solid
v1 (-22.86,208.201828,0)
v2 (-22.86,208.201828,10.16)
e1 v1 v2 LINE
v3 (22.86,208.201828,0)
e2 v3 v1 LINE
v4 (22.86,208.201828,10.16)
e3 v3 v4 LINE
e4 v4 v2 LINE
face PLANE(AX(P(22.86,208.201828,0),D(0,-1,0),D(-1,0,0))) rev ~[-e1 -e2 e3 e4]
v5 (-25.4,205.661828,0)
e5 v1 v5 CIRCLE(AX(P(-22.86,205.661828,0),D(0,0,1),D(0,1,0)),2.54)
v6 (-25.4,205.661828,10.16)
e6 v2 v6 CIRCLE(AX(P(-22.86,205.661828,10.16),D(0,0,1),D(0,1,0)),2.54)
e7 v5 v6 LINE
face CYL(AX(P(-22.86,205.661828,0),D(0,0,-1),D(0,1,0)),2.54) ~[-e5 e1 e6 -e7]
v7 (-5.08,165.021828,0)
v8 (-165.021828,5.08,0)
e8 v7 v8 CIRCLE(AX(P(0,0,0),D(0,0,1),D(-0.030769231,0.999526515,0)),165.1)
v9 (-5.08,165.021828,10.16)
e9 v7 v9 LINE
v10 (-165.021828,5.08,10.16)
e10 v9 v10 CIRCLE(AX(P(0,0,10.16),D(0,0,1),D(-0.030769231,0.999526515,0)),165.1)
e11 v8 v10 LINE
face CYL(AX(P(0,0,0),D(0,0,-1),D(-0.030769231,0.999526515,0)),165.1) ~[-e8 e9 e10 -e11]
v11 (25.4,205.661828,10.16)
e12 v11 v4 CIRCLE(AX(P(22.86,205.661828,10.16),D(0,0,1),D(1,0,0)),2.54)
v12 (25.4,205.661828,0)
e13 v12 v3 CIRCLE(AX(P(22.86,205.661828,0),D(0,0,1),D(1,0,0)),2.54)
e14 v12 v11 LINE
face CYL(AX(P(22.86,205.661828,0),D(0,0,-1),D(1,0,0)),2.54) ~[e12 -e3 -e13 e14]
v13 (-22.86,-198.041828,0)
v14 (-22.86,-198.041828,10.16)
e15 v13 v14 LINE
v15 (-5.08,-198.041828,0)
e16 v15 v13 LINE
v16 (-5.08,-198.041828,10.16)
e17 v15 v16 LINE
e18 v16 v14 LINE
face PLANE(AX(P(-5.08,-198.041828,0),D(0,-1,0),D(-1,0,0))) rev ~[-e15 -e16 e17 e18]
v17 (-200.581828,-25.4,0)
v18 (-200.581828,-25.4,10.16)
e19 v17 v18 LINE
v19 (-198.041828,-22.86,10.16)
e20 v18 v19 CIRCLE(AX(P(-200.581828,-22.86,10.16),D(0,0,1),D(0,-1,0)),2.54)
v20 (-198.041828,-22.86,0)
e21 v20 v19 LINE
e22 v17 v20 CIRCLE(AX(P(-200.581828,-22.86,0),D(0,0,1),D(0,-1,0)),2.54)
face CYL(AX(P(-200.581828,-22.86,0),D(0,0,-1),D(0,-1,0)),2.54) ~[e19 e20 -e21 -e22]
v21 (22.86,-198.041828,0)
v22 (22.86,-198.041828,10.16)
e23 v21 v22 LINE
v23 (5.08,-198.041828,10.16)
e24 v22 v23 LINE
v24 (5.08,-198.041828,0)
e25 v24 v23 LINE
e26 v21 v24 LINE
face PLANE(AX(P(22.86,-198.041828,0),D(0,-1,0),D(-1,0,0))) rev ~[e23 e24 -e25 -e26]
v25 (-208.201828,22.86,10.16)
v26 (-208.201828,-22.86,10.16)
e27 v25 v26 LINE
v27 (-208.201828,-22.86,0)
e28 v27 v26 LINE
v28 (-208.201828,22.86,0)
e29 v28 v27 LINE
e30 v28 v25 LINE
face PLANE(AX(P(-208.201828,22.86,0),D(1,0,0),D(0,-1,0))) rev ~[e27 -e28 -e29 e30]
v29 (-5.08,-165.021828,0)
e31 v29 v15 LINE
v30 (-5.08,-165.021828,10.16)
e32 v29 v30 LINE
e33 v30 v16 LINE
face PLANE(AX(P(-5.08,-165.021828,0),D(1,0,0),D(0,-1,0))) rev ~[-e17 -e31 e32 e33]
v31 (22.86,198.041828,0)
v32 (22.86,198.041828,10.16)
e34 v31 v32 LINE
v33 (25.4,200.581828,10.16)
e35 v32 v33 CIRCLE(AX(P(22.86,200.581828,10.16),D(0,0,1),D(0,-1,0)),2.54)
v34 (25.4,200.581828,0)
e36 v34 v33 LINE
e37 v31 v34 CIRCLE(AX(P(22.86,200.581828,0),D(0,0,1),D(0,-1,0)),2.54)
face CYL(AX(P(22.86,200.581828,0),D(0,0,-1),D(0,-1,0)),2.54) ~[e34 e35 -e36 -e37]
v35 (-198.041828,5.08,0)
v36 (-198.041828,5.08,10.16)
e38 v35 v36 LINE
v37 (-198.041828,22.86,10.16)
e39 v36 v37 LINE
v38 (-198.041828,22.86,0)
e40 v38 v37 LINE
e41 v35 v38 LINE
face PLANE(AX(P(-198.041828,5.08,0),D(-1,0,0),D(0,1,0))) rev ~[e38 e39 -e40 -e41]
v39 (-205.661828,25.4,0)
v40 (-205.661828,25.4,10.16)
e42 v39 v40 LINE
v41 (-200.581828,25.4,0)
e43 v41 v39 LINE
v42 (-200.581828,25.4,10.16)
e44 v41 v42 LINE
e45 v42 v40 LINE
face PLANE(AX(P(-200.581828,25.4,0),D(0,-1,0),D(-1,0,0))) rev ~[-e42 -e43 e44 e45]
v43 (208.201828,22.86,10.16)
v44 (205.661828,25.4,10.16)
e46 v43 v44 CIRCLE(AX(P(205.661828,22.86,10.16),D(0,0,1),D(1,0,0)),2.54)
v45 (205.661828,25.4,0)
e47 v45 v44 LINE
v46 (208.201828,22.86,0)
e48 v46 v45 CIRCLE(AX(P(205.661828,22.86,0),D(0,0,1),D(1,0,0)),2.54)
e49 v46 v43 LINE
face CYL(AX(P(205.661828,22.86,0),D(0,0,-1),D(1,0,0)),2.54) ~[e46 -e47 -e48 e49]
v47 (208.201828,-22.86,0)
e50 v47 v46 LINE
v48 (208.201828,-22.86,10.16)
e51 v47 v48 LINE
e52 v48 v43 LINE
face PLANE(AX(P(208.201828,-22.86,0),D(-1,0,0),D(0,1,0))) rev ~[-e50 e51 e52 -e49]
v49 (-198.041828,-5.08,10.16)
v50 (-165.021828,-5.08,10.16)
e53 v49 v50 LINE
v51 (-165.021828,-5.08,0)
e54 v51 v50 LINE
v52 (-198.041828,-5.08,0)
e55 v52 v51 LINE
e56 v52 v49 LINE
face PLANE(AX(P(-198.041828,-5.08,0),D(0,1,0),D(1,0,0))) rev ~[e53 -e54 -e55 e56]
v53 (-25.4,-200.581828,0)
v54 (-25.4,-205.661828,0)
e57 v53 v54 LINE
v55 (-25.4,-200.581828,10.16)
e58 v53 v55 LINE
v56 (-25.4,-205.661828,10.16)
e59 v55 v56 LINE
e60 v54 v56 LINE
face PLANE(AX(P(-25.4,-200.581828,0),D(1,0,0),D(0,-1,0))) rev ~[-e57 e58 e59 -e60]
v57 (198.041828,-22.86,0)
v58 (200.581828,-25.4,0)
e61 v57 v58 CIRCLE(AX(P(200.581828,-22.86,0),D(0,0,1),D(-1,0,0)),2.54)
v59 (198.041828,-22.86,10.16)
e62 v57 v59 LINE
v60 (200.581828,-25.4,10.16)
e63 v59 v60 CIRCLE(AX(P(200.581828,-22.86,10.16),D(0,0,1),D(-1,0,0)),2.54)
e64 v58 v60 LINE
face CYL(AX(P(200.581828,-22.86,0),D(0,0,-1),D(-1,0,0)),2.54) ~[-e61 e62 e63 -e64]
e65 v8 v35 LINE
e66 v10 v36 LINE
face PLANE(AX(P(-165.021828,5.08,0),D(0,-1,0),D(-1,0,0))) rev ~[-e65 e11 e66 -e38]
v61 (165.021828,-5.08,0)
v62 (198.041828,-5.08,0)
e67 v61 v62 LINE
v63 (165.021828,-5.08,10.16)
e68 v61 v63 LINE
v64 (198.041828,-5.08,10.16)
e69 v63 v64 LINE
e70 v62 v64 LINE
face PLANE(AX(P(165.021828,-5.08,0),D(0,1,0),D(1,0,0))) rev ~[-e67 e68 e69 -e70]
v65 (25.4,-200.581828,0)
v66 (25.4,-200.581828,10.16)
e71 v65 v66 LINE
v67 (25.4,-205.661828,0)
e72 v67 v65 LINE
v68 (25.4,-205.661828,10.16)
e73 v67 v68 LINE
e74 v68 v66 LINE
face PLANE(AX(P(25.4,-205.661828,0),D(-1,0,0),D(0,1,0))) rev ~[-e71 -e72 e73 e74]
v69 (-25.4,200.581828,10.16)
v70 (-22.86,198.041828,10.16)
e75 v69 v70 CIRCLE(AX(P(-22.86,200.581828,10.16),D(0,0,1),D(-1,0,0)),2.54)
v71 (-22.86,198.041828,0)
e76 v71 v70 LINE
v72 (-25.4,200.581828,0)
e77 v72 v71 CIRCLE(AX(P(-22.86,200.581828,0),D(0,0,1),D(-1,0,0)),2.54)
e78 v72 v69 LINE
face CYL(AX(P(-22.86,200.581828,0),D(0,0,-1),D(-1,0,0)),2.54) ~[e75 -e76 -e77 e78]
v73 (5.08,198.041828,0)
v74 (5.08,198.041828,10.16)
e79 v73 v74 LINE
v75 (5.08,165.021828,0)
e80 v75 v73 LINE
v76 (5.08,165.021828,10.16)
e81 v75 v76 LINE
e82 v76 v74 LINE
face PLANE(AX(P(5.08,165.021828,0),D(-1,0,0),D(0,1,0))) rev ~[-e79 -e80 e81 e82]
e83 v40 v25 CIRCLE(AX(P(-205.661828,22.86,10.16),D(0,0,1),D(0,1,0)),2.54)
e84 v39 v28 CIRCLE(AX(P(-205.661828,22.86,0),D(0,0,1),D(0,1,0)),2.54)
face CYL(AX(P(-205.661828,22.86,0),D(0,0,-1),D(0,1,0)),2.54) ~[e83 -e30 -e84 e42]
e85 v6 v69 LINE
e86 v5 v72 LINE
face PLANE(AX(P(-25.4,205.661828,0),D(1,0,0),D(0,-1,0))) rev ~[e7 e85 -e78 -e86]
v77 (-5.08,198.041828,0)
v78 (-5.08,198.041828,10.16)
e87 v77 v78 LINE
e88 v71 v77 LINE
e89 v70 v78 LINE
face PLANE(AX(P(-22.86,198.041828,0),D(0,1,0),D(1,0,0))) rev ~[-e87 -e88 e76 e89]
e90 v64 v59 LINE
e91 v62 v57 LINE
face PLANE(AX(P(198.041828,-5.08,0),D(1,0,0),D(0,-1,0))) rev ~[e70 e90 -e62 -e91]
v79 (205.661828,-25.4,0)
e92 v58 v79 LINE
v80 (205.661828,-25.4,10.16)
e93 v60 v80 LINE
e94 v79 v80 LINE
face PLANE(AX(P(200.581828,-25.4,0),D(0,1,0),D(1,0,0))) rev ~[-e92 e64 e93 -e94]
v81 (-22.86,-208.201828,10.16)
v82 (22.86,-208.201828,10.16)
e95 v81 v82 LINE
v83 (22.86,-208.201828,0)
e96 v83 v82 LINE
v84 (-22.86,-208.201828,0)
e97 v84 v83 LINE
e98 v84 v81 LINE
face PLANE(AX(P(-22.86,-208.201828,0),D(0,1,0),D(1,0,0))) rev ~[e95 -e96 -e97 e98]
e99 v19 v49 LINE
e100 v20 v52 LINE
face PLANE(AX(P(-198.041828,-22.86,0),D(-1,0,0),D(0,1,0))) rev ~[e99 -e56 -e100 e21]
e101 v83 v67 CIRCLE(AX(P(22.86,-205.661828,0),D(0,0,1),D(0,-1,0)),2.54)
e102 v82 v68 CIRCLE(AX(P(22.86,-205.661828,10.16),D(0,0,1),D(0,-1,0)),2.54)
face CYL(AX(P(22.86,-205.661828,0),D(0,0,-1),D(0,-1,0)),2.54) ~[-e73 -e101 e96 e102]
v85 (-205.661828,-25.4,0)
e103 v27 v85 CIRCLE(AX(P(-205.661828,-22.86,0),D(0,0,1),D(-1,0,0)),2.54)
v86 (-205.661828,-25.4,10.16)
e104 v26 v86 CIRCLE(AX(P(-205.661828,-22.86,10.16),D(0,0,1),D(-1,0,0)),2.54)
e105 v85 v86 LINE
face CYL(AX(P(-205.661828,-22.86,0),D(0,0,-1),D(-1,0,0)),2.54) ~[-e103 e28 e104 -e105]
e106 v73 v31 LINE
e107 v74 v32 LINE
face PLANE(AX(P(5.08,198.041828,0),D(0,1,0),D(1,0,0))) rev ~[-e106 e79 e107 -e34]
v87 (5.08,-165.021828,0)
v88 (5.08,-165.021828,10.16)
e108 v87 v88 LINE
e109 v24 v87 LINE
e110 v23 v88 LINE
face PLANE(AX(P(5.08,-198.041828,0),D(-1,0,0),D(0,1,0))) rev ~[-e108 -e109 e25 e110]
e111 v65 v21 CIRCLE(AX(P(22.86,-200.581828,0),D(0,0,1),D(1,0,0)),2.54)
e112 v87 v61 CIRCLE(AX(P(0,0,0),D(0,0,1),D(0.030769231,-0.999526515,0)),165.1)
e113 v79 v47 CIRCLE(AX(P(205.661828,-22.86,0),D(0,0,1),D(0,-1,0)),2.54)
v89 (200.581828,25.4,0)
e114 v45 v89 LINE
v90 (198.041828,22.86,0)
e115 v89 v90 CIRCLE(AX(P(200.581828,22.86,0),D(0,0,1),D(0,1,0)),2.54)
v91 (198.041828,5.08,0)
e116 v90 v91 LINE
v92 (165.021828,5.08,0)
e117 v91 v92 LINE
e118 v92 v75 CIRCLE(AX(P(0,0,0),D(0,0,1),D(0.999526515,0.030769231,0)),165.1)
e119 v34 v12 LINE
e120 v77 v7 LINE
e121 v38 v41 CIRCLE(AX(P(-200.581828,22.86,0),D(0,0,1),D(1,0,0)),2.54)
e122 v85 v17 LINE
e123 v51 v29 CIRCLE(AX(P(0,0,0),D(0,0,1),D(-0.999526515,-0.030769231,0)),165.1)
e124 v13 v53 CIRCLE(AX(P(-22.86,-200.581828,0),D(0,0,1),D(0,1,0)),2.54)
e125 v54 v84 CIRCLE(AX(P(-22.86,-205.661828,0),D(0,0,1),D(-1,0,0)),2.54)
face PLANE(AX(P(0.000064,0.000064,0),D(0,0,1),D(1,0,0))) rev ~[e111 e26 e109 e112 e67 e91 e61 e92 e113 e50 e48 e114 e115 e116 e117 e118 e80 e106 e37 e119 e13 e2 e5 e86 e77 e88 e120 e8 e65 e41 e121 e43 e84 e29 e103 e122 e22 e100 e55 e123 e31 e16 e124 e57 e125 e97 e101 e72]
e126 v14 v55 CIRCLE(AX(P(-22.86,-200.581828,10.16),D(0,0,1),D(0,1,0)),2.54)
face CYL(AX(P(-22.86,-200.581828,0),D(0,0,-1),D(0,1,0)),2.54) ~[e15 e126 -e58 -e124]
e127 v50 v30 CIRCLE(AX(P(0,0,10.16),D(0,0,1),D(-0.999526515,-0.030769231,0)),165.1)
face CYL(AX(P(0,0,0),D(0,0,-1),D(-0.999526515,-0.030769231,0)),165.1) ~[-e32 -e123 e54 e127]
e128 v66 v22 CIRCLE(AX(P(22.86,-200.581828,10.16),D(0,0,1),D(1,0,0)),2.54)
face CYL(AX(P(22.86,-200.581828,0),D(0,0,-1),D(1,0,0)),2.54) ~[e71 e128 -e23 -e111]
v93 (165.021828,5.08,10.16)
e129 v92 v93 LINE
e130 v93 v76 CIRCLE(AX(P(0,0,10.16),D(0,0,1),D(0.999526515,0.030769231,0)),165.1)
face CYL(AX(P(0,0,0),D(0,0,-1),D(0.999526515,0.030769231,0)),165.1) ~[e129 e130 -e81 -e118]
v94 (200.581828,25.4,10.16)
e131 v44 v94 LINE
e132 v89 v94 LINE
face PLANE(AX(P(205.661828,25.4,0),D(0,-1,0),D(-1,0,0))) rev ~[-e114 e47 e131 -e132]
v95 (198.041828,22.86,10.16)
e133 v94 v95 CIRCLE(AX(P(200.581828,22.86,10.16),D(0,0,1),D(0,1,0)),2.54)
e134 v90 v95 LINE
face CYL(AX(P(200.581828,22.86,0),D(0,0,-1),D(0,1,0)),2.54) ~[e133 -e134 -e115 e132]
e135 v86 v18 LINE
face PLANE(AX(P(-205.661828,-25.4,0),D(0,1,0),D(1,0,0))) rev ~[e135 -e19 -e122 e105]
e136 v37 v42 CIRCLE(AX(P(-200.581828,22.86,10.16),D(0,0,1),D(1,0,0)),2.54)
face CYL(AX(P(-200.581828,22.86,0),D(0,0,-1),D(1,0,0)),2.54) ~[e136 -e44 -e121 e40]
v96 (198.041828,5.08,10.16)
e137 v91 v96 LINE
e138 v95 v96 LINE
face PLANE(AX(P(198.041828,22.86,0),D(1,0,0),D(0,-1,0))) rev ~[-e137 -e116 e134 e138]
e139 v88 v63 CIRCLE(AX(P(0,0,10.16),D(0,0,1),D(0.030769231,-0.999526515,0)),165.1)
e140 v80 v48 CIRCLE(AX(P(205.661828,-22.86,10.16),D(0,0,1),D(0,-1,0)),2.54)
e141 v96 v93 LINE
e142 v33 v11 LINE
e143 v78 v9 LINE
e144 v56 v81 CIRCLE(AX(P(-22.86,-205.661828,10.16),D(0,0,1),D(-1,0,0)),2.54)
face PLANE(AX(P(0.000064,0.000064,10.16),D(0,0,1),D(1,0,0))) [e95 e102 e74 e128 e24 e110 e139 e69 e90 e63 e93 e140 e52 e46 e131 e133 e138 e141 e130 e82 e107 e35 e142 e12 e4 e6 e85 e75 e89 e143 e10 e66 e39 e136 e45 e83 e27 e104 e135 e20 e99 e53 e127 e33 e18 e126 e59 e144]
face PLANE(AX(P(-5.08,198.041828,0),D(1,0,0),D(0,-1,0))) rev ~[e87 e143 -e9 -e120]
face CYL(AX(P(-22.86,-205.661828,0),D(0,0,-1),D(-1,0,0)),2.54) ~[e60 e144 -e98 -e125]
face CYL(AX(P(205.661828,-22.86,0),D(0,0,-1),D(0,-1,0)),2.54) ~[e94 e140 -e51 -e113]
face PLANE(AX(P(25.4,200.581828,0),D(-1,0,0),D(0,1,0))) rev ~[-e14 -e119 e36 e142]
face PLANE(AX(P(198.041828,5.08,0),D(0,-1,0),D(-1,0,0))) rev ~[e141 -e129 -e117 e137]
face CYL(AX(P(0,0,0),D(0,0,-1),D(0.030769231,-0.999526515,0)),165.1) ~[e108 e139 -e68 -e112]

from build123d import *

# Parameters (mm, degrees)
F1_DEPTH = 10.16


with BuildPart() as f1:
    # F0 (on Top) → F1 (new body)
    with BuildSketch(Plane.XY):
        with BuildLine():
            ThreePointArc((165.0218276471, -5.08), (165.080455755, -2.5403007163), (165.1, 0))
            ThreePointArc((165.1, 0), (165.080455755, 2.5403007163), (165.0218276471, 5.08))
            ThreePointArc((165.0218276471, 5.08), (116.7433295739, 116.7433295739), (5.08, 165.0218276471))
            ThreePointArc((5.08, 165.0218276471), (2.5403007163, 165.080455755), (0, 165.1))
            ThreePointArc((0, 165.1), (-2.5403007163, 165.080455755), (-5.08, 165.0218276471))
            ThreePointArc((-5.08, 165.0218276471), (-116.7433295739, 116.7433295739), (-165.0218276471, 5.08))
            ThreePointArc((-165.0218276471, 5.08), (-165.1, 0), (-165.0218276471, -5.08))
            ThreePointArc((-165.0218276471, -5.08), (-116.7433295739, -116.7433295739), (-5.08, -165.0218276471))
            ThreePointArc((-5.08, -165.0218276471), (0, -165.1), (5.08, -165.0218276471))
            ThreePointArc((5.08, -165.0218276471), (116.7433295739, -116.7433295739), (165.0218276471, -5.08))
        make_face()
        with BuildLine():
            ThreePointArc((165.0218276471, 5.08), (165.080455755, 2.5403007163), (165.1, 0))
            ThreePointArc((165.1, 0), (165.080455755, -2.5403007163), (165.0218276471, -5.08))
            Line((165.0218276471, -5.08), (198.0418276471, -5.08))
            Line((198.0418276471, -5.08), (198.0418276471, 5.08))
            Line((198.0418276471, 5.08), (165.0218276471, 5.08))
        make_face()
        with BuildLine():
            ThreePointArc((0, 165.1), (2.5403007163, 165.080455755), (5.08, 165.0218276471))
            Line((5.08, 165.0218276471), (5.08, 198.0418276471))
            Line((5.08, 198.0418276471), (-5.08, 198.0418276471))
            Line((-5.08, 198.0418276471), (-5.08, 165.0218276471))
            ThreePointArc((-5.08, 165.0218276471), (-2.5403007163, 165.080455755), (0, 165.1))
        make_face()
        with BuildLine():
            Line((198.0418276471, 22.86), (198.0418276471, 5.08))
            Line((198.0418276471, 5.08), (203.1218276471, 5.08))
            ThreePointArc((203.1218276471, 5.08), (206.713930094, 3.59210245), (208.2018276471, 4.5e-09))
            Line((208.2018276471, 4.5e-09), (208.2018276471, 22.86))
            ThreePointArc((208.2018276471, 22.86), (207.4578788713, 24.6560512242), (205.6618276471, 25.4))
            Line((205.6618276471, 25.4), (200.5818276471, 25.4))
            ThreePointArc((200.5818276471, 25.4), (198.7857764229, 24.6560512242), (198.0418276471, 22.86))
        make_face()
        with BuildLine():
            Line((203.1218276471, 5.08), (198.0418276471, 5.08))
            Line((198.0418276471, 5.08), (198.0418276471, -5.08))
            Line((198.0418276471, -5.08), (203.1218276471, -5.08))
            ThreePointArc((203.1218276471, -5.08), (206.7139300971, -3.5921024468), (208.2018276471, 4.5e-09))
            ThreePointArc((208.2018276471, 4.5e-09), (206.713930094, 3.59210245), (203.1218276471, 5.08))
        make_face()
        with BuildLine():
            Line((5.08, -198.0418276471), (5.08, -165.0218276471))
            ThreePointArc((5.08, -165.0218276471), (0, -165.1), (-5.08, -165.0218276471))
            Line((-5.08, -165.0218276471), (-5.08, -198.0418276471))
            Line((-5.08, -198.0418276471), (5.08, -198.0418276471))
        make_face()
        with BuildLine():
            Line((203.1218276471, -5.08), (198.0418276471, -5.08))
            Line((198.0418276471, -5.08), (198.0418276471, -22.86))
            ThreePointArc((198.0418276471, -22.86), (198.7857764229, -24.6560512242), (200.5818276471, -25.4))
            Line((200.5818276471, -25.4), (205.6618276471, -25.4))
            ThreePointArc((205.6618276471, -25.4), (207.4578788713, -24.6560512242), (208.2018276471, -22.86))
            Line((208.2018276471, -22.86), (208.2018276471, 4.5e-09))
            ThreePointArc((208.2018276471, 4.5e-09), (206.7139300971, -3.5921024468), (203.1218276471, -5.08))
        make_face()
        with BuildLine():
            Line((-5.08, 198.0418276471), (5.08, 198.0418276471))
            Line((5.08, 198.0418276471), (5.08, 203.1218276471))
            ThreePointArc((5.08, 203.1218276471), (3.5921024559, 206.713930088), (2.13e-08, 208.2018276471))
            ThreePointArc((2.13e-08, 208.2018276471), (-3.5921024409, 206.7139301031), (-5.08, 203.1218276471))
            Line((-5.08, 203.1218276471), (-5.08, 198.0418276471))
        make_face()
        with BuildLine():
            Line((5.08, 203.1218276471), (5.08, 198.0418276471))
            Line((5.08, 198.0418276471), (22.86, 198.0418276471))
            ThreePointArc((22.86, 198.0418276471), (24.6560512242, 198.7857764229), (25.4, 200.5818276471))
            Line((25.4, 200.5818276471), (25.4, 205.6618276471))
            ThreePointArc((25.4, 205.6618276471), (24.6560512242, 207.4578788713), (22.86, 208.2018276471))
            Line((22.86, 208.2018276471), (2.13e-08, 208.2018276471))
            ThreePointArc((2.13e-08, 208.2018276471), (3.5921024559, 206.713930088), (5.08, 203.1218276471))
        make_face()
        with BuildLine():
            Line((22.86, -198.0418276471), (5.08, -198.0418276471))
            Line((5.08, -198.0418276471), (5.08, -203.1218276471))
            ThreePointArc((5.08, -203.1218276471), (3.5921024559, -206.713930088), (2.13e-08, -208.2018276471))
            Line((2.13e-08, -208.2018276471), (22.86, -208.2018276471))
            ThreePointArc((22.86, -208.2018276471), (24.6560512242, -207.4578788713), (25.4, -205.6618276471))
            Line((25.4, -205.6618276471), (25.4, -200.5818276471))
            ThreePointArc((25.4, -200.5818276471), (24.6560512242, -198.7857764229), (22.86, -198.0418276471))
        make_face()
        with BuildLine():
            Line((5.08, -203.1218276471), (5.08, -198.0418276471))
            Line((5.08, -198.0418276471), (-5.08, -198.0418276471))
            Line((-5.08, -198.0418276471), (-5.08, -203.1218276471))
            ThreePointArc((-5.08, -203.1218276471), (-3.5921024409, -206.7139301031), (2.13e-08, -208.2018276471))
            ThreePointArc((2.13e-08, -208.2018276471), (3.5921024559, -206.713930088), (5.08, -203.1218276471))
        make_face()
        with BuildLine():
            Line((-22.86, 198.0418276471), (-5.08, 198.0418276471))
            Line((-5.08, 198.0418276471), (-5.08, 203.1218276471))
            ThreePointArc((-5.08, 203.1218276471), (-3.5921024409, 206.7139301031), (2.13e-08, 208.2018276471))
            Line((2.13e-08, 208.2018276471), (-22.86, 208.2018276471))
            ThreePointArc((-22.86, 208.2018276471), (-24.6560512242, 207.4578788713), (-25.4, 205.6618276471))
            Line((-25.4, 205.6618276471), (-25.4, 200.5818276471))
            ThreePointArc((-25.4, 200.5818276471), (-24.6560512242, 198.7857764229), (-22.86, 198.0418276471))
        make_face()
        with BuildLine():
            Line((-198.0418276471, -5.08), (-165.0218276471, -5.08))
            ThreePointArc((-165.0218276471, -5.08), (-165.1, 0), (-165.0218276471, 5.08))
            Line((-165.0218276471, 5.08), (-198.0418276471, 5.08))
            Line((-198.0418276471, 5.08), (-198.0418276471, -5.08))
        make_face()
        with BuildLine():
            Line((-5.08, -203.1218276471), (-5.08, -198.0418276471))
            Line((-5.08, -198.0418276471), (-22.86, -198.0418276471))
            ThreePointArc((-22.86, -198.0418276471), (-24.6560512242, -198.7857764229), (-25.4, -200.5818276471))
            Line((-25.4, -200.5818276471), (-25.4, -205.6618276471))
            ThreePointArc((-25.4, -205.6618276471), (-24.6560512242, -207.4578788713), (-22.86, -208.2018276471))
            Line((-22.86, -208.2018276471), (2.13e-08, -208.2018276471))
            ThreePointArc((2.13e-08, -208.2018276471), (-3.5921024409, -206.7139301031), (-5.08, -203.1218276471))
        make_face()
        with BuildLine():
            Line((-198.0418276471, -22.86), (-198.0418276471, -5.08))
            Line((-198.0418276471, -5.08), (-203.1218276471, -5.08))
            ThreePointArc((-203.1218276471, -5.08), (-206.7139300971, -3.5921024468), (-208.2018276471, 4.5e-09))
            Line((-208.2018276471, 4.5e-09), (-208.2018276471, -22.86))
            ThreePointArc((-208.2018276471, -22.86), (-207.4578788713, -24.6560512242), (-205.6618276471, -25.4))
            Line((-205.6618276471, -25.4), (-200.5818276471, -25.4))
            ThreePointArc((-200.5818276471, -25.4), (-198.7857764229, -24.6560512242), (-198.0418276471, -22.86))
        make_face()
        with BuildLine():
            Line((-203.1218276471, -5.08), (-198.0418276471, -5.08))
            Line((-198.0418276471, -5.08), (-198.0418276471, 5.08))
            Line((-198.0418276471, 5.08), (-203.1218276471, 5.08))
            ThreePointArc((-203.1218276471, 5.08), (-206.713930094, 3.59210245), (-208.2018276471, 4.5e-09))
            ThreePointArc((-208.2018276471, 4.5e-09), (-206.7139300971, -3.5921024468), (-203.1218276471, -5.08))
        make_face()
        with BuildLine():
            Line((-203.1218276471, 5.08), (-198.0418276471, 5.08))
            Line((-198.0418276471, 5.08), (-198.0418276471, 22.86))
            ThreePointArc((-198.0418276471, 22.86), (-198.7857764229, 24.6560512242), (-200.5818276471, 25.4))
            Line((-200.5818276471, 25.4), (-205.6618276471, 25.4))
            ThreePointArc((-205.6618276471, 25.4), (-207.4578788713, 24.6560512242), (-208.2018276471, 22.86))
            Line((-208.2018276471, 22.86), (-208.2018276471, 4.5e-09))
            ThreePointArc((-208.2018276471, 4.5e-09), (-206.713930094, 3.59210245), (-203.1218276471, 5.08))
        make_face()
    extrude(amount=F1_DEPTH)


solid = f1.part
